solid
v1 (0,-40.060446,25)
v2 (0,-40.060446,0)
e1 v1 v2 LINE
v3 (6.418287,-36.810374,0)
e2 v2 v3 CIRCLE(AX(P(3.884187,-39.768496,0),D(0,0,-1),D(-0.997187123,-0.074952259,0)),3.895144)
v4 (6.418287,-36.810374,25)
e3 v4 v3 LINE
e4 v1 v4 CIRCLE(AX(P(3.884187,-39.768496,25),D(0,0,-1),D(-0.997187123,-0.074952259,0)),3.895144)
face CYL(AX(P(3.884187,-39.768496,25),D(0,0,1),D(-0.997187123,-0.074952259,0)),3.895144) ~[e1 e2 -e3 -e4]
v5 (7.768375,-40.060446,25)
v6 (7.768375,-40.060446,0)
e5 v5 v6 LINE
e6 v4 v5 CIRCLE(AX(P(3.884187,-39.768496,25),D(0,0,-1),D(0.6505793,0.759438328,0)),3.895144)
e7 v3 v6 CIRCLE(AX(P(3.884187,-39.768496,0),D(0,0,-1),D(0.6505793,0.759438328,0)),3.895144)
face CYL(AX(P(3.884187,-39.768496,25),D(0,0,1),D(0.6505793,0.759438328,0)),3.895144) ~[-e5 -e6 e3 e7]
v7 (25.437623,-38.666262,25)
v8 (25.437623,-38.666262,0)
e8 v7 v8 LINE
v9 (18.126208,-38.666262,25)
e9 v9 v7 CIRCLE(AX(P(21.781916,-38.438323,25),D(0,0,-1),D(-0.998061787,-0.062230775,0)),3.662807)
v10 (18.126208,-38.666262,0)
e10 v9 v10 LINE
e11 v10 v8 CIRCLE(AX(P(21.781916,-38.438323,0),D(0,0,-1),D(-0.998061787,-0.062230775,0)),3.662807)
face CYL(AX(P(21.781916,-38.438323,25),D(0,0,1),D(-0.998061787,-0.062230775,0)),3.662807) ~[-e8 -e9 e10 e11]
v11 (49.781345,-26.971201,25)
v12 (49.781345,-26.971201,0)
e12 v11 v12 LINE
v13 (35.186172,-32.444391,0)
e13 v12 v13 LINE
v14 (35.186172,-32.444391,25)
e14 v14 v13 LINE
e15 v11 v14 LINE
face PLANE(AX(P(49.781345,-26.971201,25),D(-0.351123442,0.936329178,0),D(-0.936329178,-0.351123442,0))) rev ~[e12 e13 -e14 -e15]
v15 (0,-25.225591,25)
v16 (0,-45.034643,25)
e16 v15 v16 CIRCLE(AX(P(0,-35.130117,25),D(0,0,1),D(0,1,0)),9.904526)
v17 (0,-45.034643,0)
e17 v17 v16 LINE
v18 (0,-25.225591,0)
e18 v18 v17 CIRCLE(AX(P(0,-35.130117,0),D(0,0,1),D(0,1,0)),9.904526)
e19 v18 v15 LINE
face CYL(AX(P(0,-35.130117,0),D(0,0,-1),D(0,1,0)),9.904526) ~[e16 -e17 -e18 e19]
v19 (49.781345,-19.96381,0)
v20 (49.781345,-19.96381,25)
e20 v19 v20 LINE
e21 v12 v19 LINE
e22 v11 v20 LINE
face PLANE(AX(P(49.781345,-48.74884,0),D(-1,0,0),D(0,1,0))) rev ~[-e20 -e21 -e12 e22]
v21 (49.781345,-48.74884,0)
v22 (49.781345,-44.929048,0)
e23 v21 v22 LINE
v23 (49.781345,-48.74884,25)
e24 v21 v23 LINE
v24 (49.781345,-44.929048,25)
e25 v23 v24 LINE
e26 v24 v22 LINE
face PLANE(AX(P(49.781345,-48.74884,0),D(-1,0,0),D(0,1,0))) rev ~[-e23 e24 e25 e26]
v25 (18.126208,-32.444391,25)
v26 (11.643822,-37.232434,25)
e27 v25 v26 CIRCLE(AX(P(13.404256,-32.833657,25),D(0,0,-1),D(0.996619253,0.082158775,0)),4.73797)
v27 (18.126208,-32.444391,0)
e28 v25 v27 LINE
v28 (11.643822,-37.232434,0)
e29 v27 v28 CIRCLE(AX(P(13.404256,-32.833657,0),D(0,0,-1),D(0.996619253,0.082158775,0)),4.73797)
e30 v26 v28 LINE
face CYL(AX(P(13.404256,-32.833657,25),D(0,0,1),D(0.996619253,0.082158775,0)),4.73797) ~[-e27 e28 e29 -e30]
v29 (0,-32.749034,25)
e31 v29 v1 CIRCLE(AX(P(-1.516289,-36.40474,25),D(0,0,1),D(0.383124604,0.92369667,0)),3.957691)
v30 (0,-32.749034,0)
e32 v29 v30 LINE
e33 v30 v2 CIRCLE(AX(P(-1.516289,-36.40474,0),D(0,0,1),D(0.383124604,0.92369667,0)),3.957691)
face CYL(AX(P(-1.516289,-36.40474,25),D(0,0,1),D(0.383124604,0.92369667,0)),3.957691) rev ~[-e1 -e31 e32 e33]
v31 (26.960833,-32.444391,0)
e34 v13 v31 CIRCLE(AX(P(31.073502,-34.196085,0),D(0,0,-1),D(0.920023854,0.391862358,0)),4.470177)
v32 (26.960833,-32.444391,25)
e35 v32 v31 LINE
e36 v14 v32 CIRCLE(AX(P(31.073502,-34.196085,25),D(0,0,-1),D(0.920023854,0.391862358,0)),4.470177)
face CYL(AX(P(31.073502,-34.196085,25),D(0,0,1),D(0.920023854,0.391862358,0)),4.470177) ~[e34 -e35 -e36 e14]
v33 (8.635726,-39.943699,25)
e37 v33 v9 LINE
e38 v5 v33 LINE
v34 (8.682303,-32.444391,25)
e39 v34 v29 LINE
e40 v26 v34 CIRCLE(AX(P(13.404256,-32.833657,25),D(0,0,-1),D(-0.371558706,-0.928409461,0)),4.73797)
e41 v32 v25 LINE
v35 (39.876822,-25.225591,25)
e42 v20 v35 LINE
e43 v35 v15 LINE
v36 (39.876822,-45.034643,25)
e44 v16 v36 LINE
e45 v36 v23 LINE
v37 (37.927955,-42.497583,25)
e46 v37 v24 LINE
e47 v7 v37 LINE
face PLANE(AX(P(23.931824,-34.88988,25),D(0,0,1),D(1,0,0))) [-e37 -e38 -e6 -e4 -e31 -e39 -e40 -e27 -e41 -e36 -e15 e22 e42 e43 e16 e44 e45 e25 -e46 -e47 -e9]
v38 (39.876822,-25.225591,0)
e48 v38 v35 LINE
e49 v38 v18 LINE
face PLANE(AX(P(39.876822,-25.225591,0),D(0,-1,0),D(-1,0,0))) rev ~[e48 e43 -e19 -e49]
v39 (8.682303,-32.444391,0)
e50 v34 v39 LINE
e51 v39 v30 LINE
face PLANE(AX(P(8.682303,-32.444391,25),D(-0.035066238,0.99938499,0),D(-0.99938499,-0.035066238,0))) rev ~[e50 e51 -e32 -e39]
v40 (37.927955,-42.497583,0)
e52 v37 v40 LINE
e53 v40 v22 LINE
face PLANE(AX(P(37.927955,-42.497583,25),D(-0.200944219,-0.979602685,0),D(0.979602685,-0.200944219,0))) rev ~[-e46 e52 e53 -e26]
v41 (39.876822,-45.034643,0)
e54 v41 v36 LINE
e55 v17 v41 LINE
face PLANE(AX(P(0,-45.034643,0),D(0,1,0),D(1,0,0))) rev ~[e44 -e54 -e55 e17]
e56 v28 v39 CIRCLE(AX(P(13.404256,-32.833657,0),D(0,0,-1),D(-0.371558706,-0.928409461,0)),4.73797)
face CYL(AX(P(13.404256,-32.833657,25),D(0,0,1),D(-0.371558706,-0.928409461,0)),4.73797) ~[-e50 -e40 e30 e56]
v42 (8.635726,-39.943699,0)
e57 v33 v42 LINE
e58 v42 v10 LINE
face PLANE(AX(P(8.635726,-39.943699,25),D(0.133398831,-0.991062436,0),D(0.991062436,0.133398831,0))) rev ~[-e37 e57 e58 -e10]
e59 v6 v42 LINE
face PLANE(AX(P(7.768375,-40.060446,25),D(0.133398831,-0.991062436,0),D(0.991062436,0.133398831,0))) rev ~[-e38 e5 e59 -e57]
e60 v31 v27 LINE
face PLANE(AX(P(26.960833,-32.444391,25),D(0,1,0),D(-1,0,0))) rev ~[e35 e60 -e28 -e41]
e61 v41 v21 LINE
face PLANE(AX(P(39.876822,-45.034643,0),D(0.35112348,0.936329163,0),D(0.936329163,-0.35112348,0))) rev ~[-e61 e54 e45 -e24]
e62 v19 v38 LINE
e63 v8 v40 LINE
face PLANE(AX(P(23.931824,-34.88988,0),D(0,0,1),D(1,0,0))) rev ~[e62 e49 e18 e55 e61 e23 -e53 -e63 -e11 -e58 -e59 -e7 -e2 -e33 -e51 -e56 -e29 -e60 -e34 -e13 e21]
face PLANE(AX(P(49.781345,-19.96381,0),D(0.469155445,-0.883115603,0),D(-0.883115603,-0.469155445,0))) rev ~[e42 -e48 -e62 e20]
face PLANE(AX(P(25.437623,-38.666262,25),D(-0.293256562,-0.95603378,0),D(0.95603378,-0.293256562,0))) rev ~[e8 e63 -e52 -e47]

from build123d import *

# Parameters (mm, degrees)
F1_DEPTH = 25
F4_DEPTH = 25
F5_DEPTH = 25


with BuildPart() as f1:
    # F0 (on Top) → F1 (new body)
    with BuildSketch(Plane.XY):
        with BuildLine():
            ThreePointArc((0, -25.2255909145), (-9.9045261741, -35.1301170886), (0, -45.0346432626))
            Line((0, -45.0346432626), (39.8768223822, -45.0346432626))
            Line((39.8768223822, -45.0346432626), (49.781344831, -48.7488396466))
            Line((49.781344831, -48.7488396466), (49.781344831, -19.9638102204))
            Line((49.781344831, -19.9638102204), (39.8768223822, -25.2255909145))
            Line((39.8768223822, -25.2255909145), (0, -25.2255909145))
        make_face()
    extrude(amount=F1_DEPTH)

    # F2 (on face) → F4 (join)
    with BuildSketch(Plane.XY.offset(25)):
        with BuildLine():
            Line((39.8768223822, -25.2255909145), (0, -25.2255909145))
            ThreePointArc((0, -25.2255909145), (-9.9045261741, -35.1301170886), (0, -45.0346432626))
            Line((0, -45.0346432626), (39.8768223822, -45.0346432626))
            Line((39.8768223822, -45.0346432626), (49.781344831, -48.7488396466))
            Line((49.781344831, -48.7488396466), (49.781344831, -19.9638102204))
            Line((49.781344831, -19.9638102204), (39.8768223822, -25.2255909145))
        make_face()
    extrude(amount=-F4_DEPTH)

    # F3 (on face) → F5 (cut)
    with BuildSketch(Plane.XY.offset(25)):
        with BuildLine():
            Line((8.6823031306, -32.4443913996), (0, -32.7490344644))
            ThreePointArc((0, -32.7490344644), (-5.4739792074, -36.4047400653), (0, -40.0604456663))
            ThreePointArc((0, -40.0604456663), (2.12452123, -36.2934819265), (6.4182874872, -36.8103741808))
            ThreePointArc((6.4182874872, -36.8103741808), (7.8913776241, -38.1191729594), (8.6357264586, -39.9436985434))
            Line((8.6357264586, -39.9436985434), (18.1262083352, -38.6662621896))
            ThreePointArc((18.1262083352, -38.6662621896), (21.7819157988, -34.7755161234), (25.4376232624, -38.6662621896))
            Line((25.4376232624, -38.6662621896), (37.927955389, -42.4975827336))
            Line((37.927955389, -42.4975827336), (49.781344831, -44.9290481875))
            Line((49.781344831, -44.9290481875), (49.781344831, -26.9712014124))
            Line((49.781344831, -26.9712014124), (35.1861715317, -32.4443913996))
            ThreePointArc((35.1861715317, -32.4443913996), (31.0735022649, -38.6662621896), (26.9608329982, -32.4443913996))
            Line((26.9608329982, -32.4443913996), (19.0401375294, -32.4443913996))
            ThreePointArc((19.0401375294, -32.4443913996), (16.6761777926, -36.8994118679), (11.6438215498, -37.2324338722))
            ThreePointArc((11.6438215498, -37.2324338722), (9.374780297, -35.3259838728), (8.6823031306, -32.4443913996))
        make_face()
        with BuildLine():
            ThreePointArc((8.6357264586, -39.9436985434), (7.8913776241, -38.1191729594), (6.4182874872, -36.8103741808))
            ThreePointArc((6.4182874872, -36.8103741808), (7.4813175027, -38.2742394866), (7.7683748677, -40.0604456663))
            Line((7.7683748677, -40.0604456663), (8.6357264586, -39.9436985434))
        make_face()
        with BuildLine():
            ThreePointArc((18.1262083352, -32.4443913996), (16.2192131955, -36.6447435476), (11.6438215498, -37.2324338722))
            ThreePointArc((11.6438215498, -37.2324338722), (16.6761777926, -36.8994118679), (19.0401375294, -32.4443913996))
            Line((19.0401375294, -32.4443913996), (18.1262083352, -32.4443913996))
        make_face()
    extrude(amount=-F5_DEPTH, mode=Mode.SUBTRACT)


solid = f1.part
